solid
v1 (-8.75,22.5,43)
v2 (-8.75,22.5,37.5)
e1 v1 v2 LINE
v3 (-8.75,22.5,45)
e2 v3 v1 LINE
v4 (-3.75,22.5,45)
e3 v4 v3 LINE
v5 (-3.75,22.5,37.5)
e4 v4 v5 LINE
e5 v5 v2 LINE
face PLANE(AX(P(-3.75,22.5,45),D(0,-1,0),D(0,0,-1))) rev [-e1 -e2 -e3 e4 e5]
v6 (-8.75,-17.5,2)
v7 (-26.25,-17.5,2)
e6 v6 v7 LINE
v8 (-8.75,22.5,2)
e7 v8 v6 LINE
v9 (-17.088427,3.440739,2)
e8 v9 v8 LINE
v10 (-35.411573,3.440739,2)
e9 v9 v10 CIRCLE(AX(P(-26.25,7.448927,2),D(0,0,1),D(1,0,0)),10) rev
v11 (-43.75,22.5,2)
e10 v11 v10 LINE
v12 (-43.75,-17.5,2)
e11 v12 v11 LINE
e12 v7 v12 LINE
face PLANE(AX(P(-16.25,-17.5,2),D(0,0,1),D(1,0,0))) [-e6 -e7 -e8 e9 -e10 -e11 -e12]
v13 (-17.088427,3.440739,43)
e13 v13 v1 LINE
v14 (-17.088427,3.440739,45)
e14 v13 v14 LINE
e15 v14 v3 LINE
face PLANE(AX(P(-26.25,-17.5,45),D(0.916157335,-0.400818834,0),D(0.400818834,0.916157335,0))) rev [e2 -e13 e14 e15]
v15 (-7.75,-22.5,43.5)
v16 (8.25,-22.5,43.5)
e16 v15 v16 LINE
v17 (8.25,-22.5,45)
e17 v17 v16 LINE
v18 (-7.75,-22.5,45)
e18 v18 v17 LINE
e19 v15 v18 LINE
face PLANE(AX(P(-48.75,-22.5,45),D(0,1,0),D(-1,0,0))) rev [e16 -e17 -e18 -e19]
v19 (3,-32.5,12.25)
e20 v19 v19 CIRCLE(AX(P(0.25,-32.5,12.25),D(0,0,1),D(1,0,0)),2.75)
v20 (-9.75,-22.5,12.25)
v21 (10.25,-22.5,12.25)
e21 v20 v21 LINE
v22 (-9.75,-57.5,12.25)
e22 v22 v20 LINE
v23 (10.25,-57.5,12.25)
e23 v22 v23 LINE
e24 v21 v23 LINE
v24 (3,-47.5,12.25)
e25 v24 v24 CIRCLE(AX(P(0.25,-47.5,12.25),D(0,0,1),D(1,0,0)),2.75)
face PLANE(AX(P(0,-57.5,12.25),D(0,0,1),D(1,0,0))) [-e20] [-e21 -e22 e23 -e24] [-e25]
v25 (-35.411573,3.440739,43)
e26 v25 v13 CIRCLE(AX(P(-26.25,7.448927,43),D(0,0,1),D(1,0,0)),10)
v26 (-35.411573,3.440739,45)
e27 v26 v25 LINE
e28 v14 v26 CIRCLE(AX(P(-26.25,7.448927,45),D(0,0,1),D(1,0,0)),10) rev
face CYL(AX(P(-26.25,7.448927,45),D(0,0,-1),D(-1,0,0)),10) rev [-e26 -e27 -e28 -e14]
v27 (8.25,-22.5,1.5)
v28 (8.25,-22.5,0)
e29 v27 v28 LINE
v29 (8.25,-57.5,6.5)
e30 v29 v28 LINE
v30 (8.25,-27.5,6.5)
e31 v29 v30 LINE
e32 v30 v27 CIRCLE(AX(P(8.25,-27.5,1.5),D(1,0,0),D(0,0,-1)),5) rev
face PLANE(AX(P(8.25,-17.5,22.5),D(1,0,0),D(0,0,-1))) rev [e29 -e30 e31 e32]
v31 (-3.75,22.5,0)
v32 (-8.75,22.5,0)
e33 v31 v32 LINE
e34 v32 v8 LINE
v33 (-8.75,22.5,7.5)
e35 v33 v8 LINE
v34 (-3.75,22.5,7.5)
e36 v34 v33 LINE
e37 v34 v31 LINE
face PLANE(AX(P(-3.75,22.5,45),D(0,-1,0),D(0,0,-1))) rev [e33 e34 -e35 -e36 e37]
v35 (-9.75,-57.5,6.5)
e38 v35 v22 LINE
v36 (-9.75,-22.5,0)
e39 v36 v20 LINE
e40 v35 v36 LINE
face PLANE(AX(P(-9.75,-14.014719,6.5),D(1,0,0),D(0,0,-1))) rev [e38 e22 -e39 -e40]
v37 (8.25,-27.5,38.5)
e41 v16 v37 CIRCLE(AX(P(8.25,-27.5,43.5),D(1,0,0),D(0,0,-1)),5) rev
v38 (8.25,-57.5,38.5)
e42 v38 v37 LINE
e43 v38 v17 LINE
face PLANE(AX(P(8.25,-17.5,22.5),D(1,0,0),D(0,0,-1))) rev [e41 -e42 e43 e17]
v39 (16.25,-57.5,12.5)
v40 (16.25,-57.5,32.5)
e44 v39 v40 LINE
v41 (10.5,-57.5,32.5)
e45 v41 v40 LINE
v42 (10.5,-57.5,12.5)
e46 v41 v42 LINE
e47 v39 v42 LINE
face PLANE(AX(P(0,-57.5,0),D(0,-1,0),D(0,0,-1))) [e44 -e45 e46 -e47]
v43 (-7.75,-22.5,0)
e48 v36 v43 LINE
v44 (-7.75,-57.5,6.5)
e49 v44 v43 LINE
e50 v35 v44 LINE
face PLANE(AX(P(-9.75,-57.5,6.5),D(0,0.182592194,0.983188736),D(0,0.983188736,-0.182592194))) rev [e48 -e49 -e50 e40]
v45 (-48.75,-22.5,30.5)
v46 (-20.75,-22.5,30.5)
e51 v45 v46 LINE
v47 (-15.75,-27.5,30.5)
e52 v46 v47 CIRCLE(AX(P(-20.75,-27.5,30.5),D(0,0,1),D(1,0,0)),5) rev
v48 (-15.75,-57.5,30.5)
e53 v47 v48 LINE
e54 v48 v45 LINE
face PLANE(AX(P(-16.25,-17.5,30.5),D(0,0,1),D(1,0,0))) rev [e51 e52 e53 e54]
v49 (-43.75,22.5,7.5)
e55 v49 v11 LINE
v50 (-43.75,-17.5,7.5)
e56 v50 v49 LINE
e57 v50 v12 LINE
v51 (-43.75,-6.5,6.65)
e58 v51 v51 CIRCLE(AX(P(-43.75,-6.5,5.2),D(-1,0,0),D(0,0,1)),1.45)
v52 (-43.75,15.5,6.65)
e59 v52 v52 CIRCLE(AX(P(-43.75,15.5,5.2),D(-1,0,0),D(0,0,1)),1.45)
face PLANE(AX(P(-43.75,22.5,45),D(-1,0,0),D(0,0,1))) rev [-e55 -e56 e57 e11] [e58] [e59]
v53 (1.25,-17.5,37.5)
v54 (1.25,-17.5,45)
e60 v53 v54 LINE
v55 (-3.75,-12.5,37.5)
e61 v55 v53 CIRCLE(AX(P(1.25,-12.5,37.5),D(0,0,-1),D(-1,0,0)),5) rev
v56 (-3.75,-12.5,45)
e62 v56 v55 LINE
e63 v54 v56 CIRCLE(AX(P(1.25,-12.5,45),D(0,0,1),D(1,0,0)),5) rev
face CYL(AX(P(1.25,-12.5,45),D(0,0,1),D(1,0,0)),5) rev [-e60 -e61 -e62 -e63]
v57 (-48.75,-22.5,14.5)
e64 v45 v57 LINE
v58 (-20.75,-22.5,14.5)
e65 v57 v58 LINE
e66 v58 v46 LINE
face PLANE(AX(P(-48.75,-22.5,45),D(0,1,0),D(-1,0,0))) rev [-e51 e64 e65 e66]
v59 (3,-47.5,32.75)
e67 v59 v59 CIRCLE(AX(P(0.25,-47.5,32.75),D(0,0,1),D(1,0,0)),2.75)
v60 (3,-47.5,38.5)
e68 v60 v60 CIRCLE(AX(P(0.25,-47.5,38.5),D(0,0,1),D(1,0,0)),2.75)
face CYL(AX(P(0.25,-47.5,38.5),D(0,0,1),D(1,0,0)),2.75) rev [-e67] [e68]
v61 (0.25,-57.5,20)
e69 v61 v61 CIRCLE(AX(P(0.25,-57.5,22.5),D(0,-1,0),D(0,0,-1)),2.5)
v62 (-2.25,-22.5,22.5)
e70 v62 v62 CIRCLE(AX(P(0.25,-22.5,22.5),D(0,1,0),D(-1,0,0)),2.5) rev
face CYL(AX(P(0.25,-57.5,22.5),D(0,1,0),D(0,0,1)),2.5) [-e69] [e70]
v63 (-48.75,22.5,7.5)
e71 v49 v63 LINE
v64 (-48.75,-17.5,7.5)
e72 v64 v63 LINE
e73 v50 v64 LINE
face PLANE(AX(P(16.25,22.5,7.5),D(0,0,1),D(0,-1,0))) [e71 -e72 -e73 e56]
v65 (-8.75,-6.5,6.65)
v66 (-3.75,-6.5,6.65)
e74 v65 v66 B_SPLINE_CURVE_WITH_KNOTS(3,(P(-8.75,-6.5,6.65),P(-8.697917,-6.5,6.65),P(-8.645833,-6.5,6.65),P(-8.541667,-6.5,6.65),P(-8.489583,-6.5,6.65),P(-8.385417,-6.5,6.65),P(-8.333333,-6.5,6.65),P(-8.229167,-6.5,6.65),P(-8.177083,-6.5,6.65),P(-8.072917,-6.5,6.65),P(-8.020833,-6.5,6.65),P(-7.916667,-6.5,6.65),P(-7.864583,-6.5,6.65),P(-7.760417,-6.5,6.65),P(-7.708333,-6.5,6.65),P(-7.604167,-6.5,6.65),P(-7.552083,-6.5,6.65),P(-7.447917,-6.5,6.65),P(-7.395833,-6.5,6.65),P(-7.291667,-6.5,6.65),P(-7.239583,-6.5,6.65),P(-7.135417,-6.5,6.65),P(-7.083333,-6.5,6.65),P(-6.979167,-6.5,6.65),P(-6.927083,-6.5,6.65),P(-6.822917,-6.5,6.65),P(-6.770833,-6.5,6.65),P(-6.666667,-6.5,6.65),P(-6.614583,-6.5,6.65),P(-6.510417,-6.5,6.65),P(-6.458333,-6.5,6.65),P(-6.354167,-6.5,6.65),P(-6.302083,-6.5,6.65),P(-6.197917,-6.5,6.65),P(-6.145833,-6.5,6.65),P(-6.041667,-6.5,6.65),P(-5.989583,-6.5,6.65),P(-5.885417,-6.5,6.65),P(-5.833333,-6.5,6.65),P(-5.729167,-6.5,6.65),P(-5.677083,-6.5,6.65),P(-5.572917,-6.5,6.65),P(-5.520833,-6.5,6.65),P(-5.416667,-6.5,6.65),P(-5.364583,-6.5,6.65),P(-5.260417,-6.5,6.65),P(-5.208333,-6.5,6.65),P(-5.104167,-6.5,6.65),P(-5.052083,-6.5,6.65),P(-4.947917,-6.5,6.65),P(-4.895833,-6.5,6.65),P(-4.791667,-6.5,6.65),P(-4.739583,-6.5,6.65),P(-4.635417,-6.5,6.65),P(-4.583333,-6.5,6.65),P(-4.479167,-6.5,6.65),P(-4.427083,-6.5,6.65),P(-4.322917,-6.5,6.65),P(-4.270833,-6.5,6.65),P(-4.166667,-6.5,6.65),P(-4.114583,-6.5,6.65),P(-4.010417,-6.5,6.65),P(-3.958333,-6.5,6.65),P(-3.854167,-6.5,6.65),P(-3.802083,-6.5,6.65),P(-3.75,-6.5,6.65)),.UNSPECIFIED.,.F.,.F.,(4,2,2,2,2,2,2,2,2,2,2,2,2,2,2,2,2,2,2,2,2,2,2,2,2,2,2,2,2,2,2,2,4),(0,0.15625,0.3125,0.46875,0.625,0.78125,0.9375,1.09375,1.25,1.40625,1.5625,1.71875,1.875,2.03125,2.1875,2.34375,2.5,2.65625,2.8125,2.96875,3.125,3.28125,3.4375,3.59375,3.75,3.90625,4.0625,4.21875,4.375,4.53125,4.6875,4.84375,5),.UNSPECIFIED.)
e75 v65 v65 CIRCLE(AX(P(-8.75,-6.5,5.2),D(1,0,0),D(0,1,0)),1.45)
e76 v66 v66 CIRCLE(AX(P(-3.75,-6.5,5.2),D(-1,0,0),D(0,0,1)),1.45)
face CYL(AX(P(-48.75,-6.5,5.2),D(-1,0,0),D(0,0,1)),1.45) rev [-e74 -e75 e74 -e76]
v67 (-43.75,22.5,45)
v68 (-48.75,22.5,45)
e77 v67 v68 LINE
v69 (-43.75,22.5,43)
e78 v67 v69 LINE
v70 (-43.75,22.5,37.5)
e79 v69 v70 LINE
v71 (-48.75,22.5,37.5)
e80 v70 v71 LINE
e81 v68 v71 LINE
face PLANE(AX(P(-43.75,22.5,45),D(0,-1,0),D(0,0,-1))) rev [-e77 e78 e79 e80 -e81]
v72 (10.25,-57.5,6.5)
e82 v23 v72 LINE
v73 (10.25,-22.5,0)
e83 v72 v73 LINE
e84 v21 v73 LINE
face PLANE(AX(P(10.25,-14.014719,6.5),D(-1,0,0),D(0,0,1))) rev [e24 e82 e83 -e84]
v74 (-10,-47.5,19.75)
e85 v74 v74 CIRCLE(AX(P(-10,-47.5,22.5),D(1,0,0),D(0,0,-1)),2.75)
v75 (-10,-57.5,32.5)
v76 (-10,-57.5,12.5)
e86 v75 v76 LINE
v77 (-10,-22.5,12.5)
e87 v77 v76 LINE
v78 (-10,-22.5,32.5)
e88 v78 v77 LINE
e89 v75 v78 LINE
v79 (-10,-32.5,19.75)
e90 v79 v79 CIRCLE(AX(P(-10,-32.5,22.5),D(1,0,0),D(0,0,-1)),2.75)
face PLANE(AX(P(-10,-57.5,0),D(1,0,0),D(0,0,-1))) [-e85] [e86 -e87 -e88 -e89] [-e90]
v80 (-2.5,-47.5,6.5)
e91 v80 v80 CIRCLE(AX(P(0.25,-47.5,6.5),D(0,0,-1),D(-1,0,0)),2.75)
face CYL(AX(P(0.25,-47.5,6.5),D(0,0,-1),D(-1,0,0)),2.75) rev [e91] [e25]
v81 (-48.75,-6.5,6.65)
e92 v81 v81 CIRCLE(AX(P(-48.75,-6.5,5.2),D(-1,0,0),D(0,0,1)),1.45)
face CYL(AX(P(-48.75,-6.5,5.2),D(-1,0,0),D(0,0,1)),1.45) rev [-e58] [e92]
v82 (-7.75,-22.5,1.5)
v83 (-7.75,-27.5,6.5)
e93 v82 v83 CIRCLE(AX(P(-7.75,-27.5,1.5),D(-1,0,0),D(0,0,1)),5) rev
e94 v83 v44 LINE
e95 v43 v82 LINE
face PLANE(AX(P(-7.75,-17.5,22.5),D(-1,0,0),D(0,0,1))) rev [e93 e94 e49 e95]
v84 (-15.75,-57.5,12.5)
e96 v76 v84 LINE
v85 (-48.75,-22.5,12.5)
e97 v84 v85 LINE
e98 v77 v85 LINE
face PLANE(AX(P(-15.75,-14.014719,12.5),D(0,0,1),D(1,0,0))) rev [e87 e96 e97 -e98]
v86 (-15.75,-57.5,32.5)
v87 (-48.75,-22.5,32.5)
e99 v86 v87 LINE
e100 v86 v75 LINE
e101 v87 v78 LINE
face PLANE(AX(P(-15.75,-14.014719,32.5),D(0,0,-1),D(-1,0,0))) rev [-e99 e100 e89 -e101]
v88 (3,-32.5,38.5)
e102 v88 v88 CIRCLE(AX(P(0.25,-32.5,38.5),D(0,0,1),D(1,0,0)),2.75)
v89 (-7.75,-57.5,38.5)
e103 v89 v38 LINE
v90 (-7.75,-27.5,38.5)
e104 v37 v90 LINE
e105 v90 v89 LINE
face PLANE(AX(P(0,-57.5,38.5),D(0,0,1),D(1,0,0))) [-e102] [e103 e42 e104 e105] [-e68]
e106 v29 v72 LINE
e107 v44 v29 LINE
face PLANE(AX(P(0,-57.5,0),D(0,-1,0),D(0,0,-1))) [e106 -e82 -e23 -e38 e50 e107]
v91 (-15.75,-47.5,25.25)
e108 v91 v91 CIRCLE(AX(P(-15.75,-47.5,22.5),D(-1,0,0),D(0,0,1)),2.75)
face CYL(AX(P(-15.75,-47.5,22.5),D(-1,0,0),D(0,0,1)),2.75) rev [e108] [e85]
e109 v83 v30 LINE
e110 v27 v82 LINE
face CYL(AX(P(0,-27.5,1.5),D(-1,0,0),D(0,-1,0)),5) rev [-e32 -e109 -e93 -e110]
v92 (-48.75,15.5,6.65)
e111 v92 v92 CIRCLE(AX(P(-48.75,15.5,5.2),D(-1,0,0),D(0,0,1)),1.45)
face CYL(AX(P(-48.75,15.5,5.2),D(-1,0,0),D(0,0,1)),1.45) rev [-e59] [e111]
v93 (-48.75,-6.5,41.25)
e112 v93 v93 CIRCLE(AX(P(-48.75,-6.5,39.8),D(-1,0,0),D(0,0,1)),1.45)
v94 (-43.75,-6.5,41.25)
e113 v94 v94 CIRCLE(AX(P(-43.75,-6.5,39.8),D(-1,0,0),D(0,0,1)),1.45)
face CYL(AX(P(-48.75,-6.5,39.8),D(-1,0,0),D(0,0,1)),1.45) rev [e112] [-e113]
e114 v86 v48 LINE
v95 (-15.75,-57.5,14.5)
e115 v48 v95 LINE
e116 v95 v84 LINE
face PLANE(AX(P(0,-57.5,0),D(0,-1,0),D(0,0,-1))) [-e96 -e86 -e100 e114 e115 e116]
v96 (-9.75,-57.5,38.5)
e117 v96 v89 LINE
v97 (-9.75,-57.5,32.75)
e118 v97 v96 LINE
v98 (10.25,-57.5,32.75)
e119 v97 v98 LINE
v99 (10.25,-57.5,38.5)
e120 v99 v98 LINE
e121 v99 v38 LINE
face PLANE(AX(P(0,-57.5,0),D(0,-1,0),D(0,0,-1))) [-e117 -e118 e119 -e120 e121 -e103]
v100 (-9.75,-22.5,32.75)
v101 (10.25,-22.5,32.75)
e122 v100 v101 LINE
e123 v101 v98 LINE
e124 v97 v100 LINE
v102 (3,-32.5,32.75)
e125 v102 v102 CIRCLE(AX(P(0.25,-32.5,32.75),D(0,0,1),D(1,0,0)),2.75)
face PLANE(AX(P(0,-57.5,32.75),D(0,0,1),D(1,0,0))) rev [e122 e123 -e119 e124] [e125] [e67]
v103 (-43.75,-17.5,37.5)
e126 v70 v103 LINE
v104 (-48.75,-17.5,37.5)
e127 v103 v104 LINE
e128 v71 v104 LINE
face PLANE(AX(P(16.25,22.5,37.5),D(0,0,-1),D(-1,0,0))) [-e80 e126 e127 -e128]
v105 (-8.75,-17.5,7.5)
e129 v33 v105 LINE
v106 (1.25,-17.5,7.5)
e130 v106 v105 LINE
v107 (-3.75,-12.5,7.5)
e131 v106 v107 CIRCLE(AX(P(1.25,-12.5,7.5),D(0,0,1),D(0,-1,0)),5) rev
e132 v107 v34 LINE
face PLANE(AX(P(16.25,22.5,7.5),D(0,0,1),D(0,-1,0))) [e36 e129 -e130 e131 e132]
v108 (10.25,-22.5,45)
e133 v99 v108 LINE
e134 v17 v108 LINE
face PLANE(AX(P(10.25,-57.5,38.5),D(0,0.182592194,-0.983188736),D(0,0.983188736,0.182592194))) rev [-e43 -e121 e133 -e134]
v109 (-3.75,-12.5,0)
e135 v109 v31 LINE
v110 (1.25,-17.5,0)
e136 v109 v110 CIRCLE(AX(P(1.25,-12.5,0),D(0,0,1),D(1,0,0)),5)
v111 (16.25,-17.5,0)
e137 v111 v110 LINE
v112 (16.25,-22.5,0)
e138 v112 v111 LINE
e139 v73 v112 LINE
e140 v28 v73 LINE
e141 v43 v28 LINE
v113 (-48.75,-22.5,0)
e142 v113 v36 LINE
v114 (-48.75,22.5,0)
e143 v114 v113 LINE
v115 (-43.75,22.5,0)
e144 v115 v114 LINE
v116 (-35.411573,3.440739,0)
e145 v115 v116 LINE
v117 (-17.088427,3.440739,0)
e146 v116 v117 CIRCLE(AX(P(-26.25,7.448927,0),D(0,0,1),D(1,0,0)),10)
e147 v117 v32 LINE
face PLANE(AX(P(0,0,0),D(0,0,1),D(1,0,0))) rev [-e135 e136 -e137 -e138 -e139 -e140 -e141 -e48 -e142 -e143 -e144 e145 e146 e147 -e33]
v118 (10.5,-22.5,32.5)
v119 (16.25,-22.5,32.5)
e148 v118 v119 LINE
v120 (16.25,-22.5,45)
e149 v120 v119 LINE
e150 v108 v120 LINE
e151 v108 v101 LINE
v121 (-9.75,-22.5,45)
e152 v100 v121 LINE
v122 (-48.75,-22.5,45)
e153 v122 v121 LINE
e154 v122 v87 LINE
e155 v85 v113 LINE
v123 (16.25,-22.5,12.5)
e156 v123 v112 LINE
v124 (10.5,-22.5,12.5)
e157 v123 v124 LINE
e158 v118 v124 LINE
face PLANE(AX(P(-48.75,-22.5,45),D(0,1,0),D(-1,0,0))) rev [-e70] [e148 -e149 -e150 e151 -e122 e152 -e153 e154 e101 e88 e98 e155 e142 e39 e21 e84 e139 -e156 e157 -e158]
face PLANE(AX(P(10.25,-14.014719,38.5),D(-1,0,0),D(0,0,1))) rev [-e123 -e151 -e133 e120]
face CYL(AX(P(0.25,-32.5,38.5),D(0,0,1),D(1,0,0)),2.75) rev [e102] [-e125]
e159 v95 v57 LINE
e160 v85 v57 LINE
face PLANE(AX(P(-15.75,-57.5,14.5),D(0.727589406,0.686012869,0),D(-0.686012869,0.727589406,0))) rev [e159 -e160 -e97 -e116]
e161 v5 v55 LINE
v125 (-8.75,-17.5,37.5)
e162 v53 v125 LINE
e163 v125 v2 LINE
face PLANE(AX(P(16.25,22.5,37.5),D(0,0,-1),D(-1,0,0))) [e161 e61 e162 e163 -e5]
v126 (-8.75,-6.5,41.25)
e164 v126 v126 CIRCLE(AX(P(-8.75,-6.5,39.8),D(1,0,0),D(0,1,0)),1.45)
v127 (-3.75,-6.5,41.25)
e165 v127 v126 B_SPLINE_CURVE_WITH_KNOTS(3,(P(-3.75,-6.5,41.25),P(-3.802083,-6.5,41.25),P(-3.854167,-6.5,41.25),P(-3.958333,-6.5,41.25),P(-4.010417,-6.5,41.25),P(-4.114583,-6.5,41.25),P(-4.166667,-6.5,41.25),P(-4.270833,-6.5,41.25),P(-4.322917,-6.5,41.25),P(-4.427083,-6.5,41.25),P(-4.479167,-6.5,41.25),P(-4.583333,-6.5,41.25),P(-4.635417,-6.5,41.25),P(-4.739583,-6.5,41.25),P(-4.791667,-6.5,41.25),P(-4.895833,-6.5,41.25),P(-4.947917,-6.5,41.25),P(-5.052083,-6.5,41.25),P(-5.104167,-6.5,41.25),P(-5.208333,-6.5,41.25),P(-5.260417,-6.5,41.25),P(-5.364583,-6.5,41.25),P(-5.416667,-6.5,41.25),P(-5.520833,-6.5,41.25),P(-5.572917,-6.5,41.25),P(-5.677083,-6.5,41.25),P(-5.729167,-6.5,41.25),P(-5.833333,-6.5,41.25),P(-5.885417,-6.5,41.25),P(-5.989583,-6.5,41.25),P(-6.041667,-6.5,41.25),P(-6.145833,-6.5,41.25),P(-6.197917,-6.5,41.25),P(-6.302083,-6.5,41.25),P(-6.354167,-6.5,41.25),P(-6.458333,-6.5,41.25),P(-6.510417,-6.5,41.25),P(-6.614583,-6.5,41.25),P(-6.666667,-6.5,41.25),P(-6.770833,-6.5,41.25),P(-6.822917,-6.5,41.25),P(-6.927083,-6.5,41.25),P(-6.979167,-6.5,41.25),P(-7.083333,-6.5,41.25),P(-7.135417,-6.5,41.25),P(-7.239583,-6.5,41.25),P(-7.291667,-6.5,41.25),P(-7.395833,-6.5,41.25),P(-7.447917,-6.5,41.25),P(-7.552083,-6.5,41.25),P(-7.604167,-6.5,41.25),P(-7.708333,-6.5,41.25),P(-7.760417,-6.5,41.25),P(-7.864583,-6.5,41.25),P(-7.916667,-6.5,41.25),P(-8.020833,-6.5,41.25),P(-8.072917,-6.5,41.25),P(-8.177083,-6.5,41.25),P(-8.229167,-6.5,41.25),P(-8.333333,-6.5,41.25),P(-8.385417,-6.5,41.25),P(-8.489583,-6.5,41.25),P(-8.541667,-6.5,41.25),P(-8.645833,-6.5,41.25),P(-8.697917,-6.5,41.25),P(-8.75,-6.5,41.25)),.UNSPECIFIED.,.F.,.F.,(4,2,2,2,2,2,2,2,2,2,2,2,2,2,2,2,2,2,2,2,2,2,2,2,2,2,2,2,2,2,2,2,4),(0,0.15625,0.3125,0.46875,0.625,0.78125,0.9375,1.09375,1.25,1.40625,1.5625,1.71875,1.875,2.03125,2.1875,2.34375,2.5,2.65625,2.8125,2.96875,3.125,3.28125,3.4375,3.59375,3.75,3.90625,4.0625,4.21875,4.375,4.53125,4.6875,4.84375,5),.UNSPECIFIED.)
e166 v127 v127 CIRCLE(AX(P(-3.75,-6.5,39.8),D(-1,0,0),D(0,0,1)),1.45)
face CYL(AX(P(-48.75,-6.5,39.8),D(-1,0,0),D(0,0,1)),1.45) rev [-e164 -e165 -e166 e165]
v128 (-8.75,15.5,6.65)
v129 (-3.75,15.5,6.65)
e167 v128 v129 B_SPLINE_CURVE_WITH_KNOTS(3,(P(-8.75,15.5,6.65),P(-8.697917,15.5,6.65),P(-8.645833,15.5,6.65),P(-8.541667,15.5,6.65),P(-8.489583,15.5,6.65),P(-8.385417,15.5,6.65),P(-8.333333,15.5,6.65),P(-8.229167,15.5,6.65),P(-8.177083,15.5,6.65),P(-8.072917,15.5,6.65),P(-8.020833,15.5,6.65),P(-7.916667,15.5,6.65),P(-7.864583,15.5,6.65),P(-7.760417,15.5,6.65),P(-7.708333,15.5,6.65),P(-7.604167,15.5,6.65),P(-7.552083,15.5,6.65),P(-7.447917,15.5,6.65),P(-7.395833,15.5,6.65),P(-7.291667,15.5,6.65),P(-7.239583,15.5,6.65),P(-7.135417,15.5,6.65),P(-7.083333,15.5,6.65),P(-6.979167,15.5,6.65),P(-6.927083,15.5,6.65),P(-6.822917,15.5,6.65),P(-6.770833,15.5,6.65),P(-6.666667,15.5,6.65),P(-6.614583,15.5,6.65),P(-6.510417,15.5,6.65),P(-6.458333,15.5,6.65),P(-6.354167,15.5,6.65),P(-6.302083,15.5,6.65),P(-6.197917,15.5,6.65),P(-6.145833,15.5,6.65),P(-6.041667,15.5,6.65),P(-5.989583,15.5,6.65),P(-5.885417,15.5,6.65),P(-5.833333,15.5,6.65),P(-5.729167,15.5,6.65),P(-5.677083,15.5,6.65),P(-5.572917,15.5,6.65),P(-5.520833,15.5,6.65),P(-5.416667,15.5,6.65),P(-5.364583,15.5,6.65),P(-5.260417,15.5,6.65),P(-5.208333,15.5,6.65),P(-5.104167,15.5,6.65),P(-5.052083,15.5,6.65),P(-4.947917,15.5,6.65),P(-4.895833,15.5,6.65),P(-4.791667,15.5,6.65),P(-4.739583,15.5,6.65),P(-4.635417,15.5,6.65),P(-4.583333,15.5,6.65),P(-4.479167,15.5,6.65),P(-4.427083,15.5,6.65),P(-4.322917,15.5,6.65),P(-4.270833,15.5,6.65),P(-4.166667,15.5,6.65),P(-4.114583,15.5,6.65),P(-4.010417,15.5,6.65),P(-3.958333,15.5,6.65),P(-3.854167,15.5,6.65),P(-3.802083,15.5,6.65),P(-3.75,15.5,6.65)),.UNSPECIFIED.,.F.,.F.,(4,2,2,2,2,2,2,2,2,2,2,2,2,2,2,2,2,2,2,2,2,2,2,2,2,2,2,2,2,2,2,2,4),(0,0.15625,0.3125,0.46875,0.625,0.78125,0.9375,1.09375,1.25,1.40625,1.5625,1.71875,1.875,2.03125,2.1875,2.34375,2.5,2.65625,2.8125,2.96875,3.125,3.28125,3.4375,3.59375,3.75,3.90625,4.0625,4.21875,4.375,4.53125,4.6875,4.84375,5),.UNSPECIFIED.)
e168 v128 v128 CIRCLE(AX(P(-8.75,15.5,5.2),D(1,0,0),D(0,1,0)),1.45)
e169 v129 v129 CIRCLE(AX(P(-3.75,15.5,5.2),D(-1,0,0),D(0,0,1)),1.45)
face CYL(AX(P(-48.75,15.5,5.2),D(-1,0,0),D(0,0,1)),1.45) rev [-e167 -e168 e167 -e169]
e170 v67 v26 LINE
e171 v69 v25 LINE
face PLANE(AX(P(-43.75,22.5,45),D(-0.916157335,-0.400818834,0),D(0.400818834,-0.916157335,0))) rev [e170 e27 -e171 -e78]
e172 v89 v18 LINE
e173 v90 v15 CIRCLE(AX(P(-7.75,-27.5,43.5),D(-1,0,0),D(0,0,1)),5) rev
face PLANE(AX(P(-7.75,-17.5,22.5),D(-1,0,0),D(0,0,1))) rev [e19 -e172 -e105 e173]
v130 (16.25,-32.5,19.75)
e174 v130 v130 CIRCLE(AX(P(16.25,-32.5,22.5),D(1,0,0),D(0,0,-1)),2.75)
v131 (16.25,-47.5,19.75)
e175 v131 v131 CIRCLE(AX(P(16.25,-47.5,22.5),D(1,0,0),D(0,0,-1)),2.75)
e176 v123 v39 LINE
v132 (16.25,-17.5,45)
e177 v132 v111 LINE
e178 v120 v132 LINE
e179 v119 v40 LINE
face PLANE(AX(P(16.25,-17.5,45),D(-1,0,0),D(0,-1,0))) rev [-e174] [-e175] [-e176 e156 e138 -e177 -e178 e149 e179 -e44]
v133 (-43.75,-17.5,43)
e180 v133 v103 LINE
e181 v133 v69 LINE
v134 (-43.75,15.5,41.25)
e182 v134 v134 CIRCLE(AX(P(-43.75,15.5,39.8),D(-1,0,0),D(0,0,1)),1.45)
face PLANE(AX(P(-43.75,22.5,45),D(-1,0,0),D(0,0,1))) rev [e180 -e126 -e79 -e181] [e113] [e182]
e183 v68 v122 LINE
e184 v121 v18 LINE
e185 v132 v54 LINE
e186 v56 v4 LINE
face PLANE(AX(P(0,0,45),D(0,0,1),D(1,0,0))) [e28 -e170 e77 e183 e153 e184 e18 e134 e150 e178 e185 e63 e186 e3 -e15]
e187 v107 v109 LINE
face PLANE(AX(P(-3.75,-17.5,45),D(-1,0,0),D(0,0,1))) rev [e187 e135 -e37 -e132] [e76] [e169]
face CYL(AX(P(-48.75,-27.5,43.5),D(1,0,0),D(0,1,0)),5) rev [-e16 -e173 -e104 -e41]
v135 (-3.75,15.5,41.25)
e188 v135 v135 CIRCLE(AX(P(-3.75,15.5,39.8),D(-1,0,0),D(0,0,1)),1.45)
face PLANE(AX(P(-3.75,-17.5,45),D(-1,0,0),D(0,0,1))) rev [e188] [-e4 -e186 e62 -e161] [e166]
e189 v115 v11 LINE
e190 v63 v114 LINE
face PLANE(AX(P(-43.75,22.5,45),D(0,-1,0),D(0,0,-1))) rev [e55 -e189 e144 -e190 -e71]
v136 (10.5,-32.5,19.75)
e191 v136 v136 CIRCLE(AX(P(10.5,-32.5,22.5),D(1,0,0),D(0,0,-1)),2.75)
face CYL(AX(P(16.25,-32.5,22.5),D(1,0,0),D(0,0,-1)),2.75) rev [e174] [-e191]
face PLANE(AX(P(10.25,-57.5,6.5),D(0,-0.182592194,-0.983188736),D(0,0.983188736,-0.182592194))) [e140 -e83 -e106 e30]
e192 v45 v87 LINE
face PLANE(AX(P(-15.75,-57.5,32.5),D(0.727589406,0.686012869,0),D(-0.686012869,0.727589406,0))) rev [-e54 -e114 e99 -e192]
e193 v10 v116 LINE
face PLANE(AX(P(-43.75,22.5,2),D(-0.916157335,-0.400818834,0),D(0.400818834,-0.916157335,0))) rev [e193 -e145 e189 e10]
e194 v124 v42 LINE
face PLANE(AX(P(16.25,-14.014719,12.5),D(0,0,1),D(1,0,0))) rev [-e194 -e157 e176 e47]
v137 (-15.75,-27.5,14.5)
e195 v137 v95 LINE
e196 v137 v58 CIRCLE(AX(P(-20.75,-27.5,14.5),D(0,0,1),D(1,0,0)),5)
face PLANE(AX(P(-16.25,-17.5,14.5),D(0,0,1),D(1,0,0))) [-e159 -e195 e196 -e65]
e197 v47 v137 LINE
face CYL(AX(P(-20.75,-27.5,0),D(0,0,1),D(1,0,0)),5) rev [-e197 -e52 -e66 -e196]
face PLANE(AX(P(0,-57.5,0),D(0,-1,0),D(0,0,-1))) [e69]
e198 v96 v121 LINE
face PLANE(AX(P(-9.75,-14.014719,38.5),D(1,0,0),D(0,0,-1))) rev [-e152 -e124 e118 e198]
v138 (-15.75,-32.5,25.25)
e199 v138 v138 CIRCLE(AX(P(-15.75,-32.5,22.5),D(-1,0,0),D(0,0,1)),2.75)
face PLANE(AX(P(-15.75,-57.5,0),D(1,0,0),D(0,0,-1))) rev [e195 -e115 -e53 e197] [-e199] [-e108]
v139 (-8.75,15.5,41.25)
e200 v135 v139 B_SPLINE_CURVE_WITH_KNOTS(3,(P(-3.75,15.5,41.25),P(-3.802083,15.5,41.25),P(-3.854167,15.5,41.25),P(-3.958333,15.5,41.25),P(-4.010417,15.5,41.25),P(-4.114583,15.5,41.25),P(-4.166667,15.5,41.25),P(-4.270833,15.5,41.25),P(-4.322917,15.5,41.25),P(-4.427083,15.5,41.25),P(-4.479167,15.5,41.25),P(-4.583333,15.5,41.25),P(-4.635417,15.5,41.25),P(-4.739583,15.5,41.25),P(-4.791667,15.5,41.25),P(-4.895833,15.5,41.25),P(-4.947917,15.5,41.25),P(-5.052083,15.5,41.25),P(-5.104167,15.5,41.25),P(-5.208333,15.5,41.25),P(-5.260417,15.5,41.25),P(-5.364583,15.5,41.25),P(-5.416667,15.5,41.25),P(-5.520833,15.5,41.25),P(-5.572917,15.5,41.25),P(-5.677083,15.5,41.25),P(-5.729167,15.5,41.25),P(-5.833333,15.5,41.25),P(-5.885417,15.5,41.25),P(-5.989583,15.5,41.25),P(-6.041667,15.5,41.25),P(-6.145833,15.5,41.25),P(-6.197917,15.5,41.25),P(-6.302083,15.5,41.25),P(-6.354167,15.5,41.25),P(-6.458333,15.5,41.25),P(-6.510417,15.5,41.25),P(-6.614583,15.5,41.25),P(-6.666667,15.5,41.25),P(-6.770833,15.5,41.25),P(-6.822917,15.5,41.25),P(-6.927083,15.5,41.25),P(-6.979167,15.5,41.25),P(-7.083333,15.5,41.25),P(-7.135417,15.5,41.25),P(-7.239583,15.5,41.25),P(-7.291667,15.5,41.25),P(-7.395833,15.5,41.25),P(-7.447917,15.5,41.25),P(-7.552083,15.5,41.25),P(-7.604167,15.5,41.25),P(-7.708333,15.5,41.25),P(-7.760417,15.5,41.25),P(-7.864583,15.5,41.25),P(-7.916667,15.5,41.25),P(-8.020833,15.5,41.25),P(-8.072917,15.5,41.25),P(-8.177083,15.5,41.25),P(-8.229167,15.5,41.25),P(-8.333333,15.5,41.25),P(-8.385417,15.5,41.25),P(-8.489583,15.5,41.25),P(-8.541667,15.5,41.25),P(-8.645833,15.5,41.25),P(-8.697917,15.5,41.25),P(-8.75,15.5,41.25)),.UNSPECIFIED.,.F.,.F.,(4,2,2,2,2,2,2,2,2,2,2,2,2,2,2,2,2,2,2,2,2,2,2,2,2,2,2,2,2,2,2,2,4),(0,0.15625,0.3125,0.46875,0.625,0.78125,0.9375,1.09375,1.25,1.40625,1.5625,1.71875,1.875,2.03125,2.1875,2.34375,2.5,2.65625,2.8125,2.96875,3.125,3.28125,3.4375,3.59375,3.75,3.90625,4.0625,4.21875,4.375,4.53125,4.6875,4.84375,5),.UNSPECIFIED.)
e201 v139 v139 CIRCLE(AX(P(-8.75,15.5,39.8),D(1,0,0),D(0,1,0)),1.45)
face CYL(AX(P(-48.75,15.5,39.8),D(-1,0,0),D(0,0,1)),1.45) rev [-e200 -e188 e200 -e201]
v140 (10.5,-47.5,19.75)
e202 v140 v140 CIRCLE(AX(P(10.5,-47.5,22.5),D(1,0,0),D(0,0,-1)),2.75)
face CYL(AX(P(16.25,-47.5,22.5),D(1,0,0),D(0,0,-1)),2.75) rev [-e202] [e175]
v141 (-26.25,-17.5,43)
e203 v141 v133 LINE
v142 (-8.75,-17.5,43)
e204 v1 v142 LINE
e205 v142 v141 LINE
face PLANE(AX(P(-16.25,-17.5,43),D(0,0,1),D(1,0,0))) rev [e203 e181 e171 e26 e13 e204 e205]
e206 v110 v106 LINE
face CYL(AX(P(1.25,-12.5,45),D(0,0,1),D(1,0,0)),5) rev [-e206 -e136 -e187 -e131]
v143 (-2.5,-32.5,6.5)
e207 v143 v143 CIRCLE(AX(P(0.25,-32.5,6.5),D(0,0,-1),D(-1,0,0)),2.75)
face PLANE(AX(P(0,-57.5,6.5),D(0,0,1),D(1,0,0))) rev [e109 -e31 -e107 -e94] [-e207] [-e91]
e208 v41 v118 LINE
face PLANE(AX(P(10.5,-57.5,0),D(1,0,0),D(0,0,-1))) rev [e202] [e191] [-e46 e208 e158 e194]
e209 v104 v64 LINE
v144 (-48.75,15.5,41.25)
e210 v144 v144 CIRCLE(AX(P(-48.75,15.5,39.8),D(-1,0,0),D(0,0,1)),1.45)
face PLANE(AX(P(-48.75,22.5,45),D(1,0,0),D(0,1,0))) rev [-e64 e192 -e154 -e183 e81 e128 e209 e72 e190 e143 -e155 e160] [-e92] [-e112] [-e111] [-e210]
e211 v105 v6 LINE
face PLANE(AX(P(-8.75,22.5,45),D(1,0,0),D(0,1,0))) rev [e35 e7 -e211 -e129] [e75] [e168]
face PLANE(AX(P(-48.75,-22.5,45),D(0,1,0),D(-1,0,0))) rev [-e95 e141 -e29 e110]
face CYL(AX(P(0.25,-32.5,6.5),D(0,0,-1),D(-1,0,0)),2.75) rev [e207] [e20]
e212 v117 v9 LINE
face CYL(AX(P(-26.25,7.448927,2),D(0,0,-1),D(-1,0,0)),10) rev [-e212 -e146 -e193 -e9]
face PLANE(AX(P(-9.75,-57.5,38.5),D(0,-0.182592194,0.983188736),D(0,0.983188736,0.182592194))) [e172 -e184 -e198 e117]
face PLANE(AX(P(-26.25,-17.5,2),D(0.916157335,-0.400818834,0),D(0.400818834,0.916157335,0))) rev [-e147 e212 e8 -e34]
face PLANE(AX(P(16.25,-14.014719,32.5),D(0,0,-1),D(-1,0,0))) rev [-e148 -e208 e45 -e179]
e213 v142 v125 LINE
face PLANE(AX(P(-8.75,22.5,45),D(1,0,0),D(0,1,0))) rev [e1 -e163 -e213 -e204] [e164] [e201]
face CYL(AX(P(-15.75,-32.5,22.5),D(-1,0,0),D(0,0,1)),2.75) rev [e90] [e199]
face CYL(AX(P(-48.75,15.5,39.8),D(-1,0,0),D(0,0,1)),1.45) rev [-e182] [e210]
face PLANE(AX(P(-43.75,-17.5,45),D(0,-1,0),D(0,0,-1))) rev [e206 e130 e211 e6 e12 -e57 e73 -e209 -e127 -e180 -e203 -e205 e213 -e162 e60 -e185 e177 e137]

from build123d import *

# Parameters (mm, degrees)
BOSS_EXTRUDE1_DEPTH           = 45
SKETCH3_W                     = 30
SKETCH3_H                     = 40
CUT_EXTRUDE1_DEPTH            = 83.196411114
SKETCH4_W                     = 32
SKETCH4_H                     = 32
SKETCH4_W_2                   = 20.5
SKETCH4_H_2                   = 20.5
SKETCH4_R                     = 2.5
BOSS_EXTRUDE2_DEPTH           = 35
SKETCH6_W                     = 6
SKETCH6_H                     = 6
CUT_EXTRUDE4_DEPTH            = 35
RIB1_REACH                    = 84.092
SKETCH9_WALL_W                = 214.287640152
SKETCH9_WALL_H                = 2
LPATTERN1_COUNT               = 2
LPATTERN1_PITCH               = 18
RIB6_REACH                    = 95.874
SKETCH14_WALL_W               = 225.34562544
SKETCH14_WALL_H               = 2
RIB7_START                    = -2
RIB7_DEPTH                    = 2
CIRPATTERN3_START             = -9.75
CIRPATTERN3_DEPTH             = 2
CIRPATTERN3_START_2           = 8.25
CIRPATTERN3_2_DEPTH           = 2
FILLET2_R                     = 5
FILLET3_R                     = 5
RIB10_REACH                   = 89.794
SKETCH17_WALL_W               = 221.248919868
SKETCH17_WALL_H               = 2
RIB11_REACH                   = 89.794
SKETCH18_WALL_W               = 221.248919868
SKETCH18_WALL_H               = 2
FILLET4_R                     = 10
LPATTERN2_COUNT               = 2
LPATTERN2_PITCH               = 43
FILLET4_OF_LPATTERN2_R        = 10
M5_CLEARANCE_HOLE2_AT_2_COUNT = 2
M5_CLEARANCE_HOLE2_AT_2_PITCH = 15
CIRPATTERN4_START             = 6.5
CIRPATTERN4_OUTLINE_R         = 2.75
CIRPATTERN4_DEPTH             = 5.75
CIRPATTERN4_START_2           = -15.75
CIRPATTERN4_2_OUTLINE_R       = 2.75
CIRPATTERN4_2_DEPTH           = 5.75
CIRPATTERN4_START_3           = 10.5
CIRPATTERN4_3_OUTLINE_R       = 2.75
CIRPATTERN4_3_DEPTH           = 5.75
M2_5_CLEARANCE_HOLE1_D        = 2.9


# Read off the part's stored shape, not the designer's step: Rib7, CirPattern3, CirPattern4
with BuildPart() as part:
    # Sketch2 → Boss-Extrude1 (new body)
    with BuildSketch(Plane.XY):
        Polygon((-48.75, -22.5), (16.25, -22.5), (16.25, -17.5), (-3.75, -17.5), (-3.75, 22.5), (-8.75, 22.5), (-8.75, -17.5), (-43.75, -17.5), (-43.75, 22.5), (-48.75, 22.5), align=None)
    extrude(amount=BOSS_EXTRUDE1_DEPTH)

    # Sketch3 → Cut-Extrude1 (cut, through all)
    with BuildSketch(Plane(origin=(-48.75, 0, 0), x_dir=(0, 0, -1), z_dir=(1, 0, 0))):
        with Locations((-22.5, 2.5)):
            Rectangle(SKETCH3_W, SKETCH3_H)
    extrude(amount=CUT_EXTRUDE1_DEPTH, mode=Mode.SUBTRACT)

    # Sketch4 → Boss-Extrude2 (add)
    # profile 1 of 2: a face of its own
    with BuildSketch(Plane.XZ.offset(22.5)):
        with Locations((0.25, 22.5)):
            Rectangle(SKETCH4_W, SKETCH4_H)
        with Locations((0.25, 22.5)):
            Rectangle(SKETCH4_W_2, SKETCH4_H_2, mode=Mode.SUBTRACT)
    # profile 2 of 2: a face of its own
    with BuildSketch(Plane.XZ.offset(22.5)):
        with Locations(Location((0.25, 22.5, 0), (0, 0, 180))):
            Circle(SKETCH4_R)
    extrude(amount=BOSS_EXTRUDE2_DEPTH)

    # Sketch6 → Cut-Extrude4 (cut)
    with BuildSketch(Plane(origin=(0, -57.5, 0), x_dir=(-1, 0, 0), z_dir=(0, -1, 0))):
        with Locations((12.75, -35.5)):
            Rectangle(SKETCH6_W, SKETCH6_H)
        with Locations((-13.25, -35.5)):
            Rectangle(SKETCH6_W, SKETCH6_H)
        with Locations((-13.25, -9.5)):
            Rectangle(SKETCH6_W, SKETCH6_H)
        with Locations((12.75, -9.5)):
            Rectangle(SKETCH6_W, SKETCH6_H)
    extrude(amount=-CUT_EXTRUDE4_DEPTH, mode=Mode.SUBTRACT)

    # Sketch9 wall → Rib1 (add, up to next)
    with BuildSketch(Plane(origin=(-32.25, -40, 32.5), x_dir=(-0.686012868689, 0.727589406185, 0), z_dir=(-0.727589406185, -0.686012868689, 0)), mode=Mode.PRIVATE) as rib1_sk1:
        with Locations((0, 1)):
            Rectangle(SKETCH9_WALL_W, SKETCH9_WALL_H)
    rib1_tool1 = extrude(rib1_sk1.sketch, amount=-RIB1_REACH, mode=Mode.PRIVATE) - part.part
    rib1 = rib1_tool1.solids().sort_by_distance((-32.25, -40, 32.5))[0]
    add(rib1)

    # LPattern1: Rib1 ×2
    with Locations(*[(0, 0, -i * LPATTERN1_PITCH) for i in range(1, LPATTERN1_COUNT)]):
        add(rib1)

    # Sketch14 wall → Rib6 (add, up to next)
    with BuildSketch(Plane(origin=(10.25, -40, 3.25), x_dir=(0, 0.983188736076, -0.182592193843), z_dir=(0, 0.182592193843, 0.983188736076)), mode=Mode.PRIVATE) as rib6_sk1:
        with Locations((0, 1)):
            Rectangle(SKETCH14_WALL_W, SKETCH14_WALL_H)
    rib6_tool1 = extrude(rib6_sk1.sketch, amount=RIB6_REACH, mode=Mode.PRIVATE) - part.part
    add(rib6_tool1.solids().sort_by_distance((10.25, -40, 3.25))[0])

    # Rib7 outline → Rib7 (add)
    with BuildSketch(Plane.ZY.offset(9.75).offset(RIB7_START)):
        Polygon((0, -22.5), (6.5, -57.5), (6.5, -22.5), align=None)
    extrude(amount=RIB7_DEPTH)

    # CirPattern3 outline → CirPattern3 (add)
    with BuildSketch(Plane.YZ.offset(CIRPATTERN3_START)):
        Polygon((-22.5, 38.5), (-22.5, 45), (-57.5, 38.5), align=None)
    extrude(amount=CIRPATTERN3_DEPTH)

    # CirPattern3 2 outline → CirPattern3 2 (add)
    with BuildSketch(Plane.YZ.offset(CIRPATTERN3_START_2)):
        Polygon((-22.5, 38.5), (-22.5, 45), (-57.5, 38.5), align=None)
    extrude(amount=CIRPATTERN3_2_DEPTH)

    # Fillet2
    fillet2_edges = [part.edges().sort_by_distance(p)[0] for p in [
        (-15.75, -22.5, 22.5),
        (0.25, -22.5, 6.5),
        (0.25, -22.5, 38.5),
    ]]
    fillet(fillet2_edges, radius=FILLET2_R)

    # Fillet3
    fillet3_edges = [part.edges().sort_by_distance(p)[0] for p in [
        (-3.75, -17.5, 41.25),
        (-3.75, -17.5, 3.75),
    ]]
    fillet(fillet3_edges, radius=FILLET3_R)

    # Sketch17 wall → Rib10 (add, up to next)
    with BuildSketch(Plane(origin=(-35, 2.5, 45), x_dir=(0.40081883402, -0.916157334902, 0), z_dir=(0.916157334902, 0.40081883402, 0)), mode=Mode.PRIVATE) as rib10_sk1:
        with Locations((0, 1)):
            Rectangle(SKETCH17_WALL_W, SKETCH17_WALL_H)
    rib10_tool1 = extrude(rib10_sk1.sketch, amount=-RIB10_REACH, mode=Mode.PRIVATE) - part.part
    rib10 = rib10_tool1.solids().sort_by_distance((-35, 2.5, 45))[0]
    add(rib10)

    # Sketch18 wall → Rib11 (add, up to next)
    with BuildSketch(Plane(origin=(-17.5, 2.5, 45), x_dir=(0.40081883402, 0.916157334902, 0), z_dir=(-0.916157334902, 0.40081883402, 0)), mode=Mode.PRIVATE) as rib11_sk1:
        with Locations((0, 1)):
            Rectangle(SKETCH18_WALL_W, SKETCH18_WALL_H)
    rib11_tool1 = extrude(rib11_sk1.sketch, amount=-RIB11_REACH, mode=Mode.PRIVATE) - part.part
    rib11 = rib11_tool1.solids().sort_by_distance((-17.5, 2.5, 45))[0]
    add(rib11)

    # Fillet4
    # the kernel refuses this fillet: 10 mm, written as the material it adds along each edge
    with BuildSketch(Plane(origin=(-26.25, -17.5, 45), x_dir=(-0.4008188340200225, 0.9161573349020514, 0), z_dir=(0, 0, -1))) as fillet4_piece_1:
        with BuildLine():
            CenterArc((FILLET4_R * 2.28571428571, FILLET4_R), FILLET4_R, 137.258755461, 132.741244539)
            Line((FILLET4_R * 1.55128805621, FILLET4_R * 1.67868852459), (0, 0))
            Line((0, 0), (FILLET4_R * 2.28571428571, 0))
        make_face()
    extrude(amount=2)

    # LPattern2: Rib10, Rib11 ×2
    with Locations(*[(0, 0, -i * LPATTERN2_PITCH) for i in range(1, LPATTERN2_COUNT)]):
        add(rib10)
        add(rib11)

    # Fillet4 of LPattern2
    # the kernel refuses this fillet: 10 mm, written as the material it adds along each edge
    with BuildSketch(Plane(origin=(-26.25, -17.5, 59.142857143), x_dir=(-0.4008188340200225, 0.9161573349020515, 0), z_dir=(0, 0, -1))) as fillet4_of_lpattern2_piece_1_section:
        with BuildLine():
            CenterArc((FILLET4_OF_LPATTERN2_R * 2.28571428571, FILLET4_OF_LPATTERN2_R), FILLET4_OF_LPATTERN2_R, 137.258755461, 132.741244539)
            Line((FILLET4_OF_LPATTERN2_R * 1.5512880562, FILLET4_OF_LPATTERN2_R * 1.67868852459), (0, 0))
            Line((0, 0), (FILLET4_OF_LPATTERN2_R * 2.28571428571, 0))
        make_face()
    fillet4_of_lpattern2_piece_1 = extrude(amount=59.142857143, mode=Mode.PRIVATE)
    fillet4_of_lpattern2_piece_1 = split(fillet4_of_lpattern2_piece_1, bisect_by=Plane(origin=(-26.25, -6.732617491, 43), z_dir=(0, 0, 1)), keep=Keep.TOP, mode=Mode.PRIVATE)
    fillet4_of_lpattern2_piece_1 = split(fillet4_of_lpattern2_piece_1, bisect_by=Plane(origin=(-26.25, -6.732617491, 45), z_dir=(0, 0, -1)), keep=Keep.TOP, mode=Mode.PRIVATE)
    add(fillet4_of_lpattern2_piece_1)
    with BuildSketch(Plane(origin=(-26.25, -17.5, 2), x_dir=(-0.4008188340200225, 0.9161573349020514, 0), z_dir=(0, 0, -1))) as fillet4_of_lpattern2_piece_2:
        with BuildLine():
            CenterArc((FILLET4_OF_LPATTERN2_R * 2.28571428571, FILLET4_OF_LPATTERN2_R), FILLET4_OF_LPATTERN2_R, 137.258755461, 132.741244539)
            Line((FILLET4_OF_LPATTERN2_R * 1.55128805621, FILLET4_OF_LPATTERN2_R * 1.67868852459), (0, 0))
            Line((0, 0), (FILLET4_OF_LPATTERN2_R * 2.28571428571, 0))
        make_face()
    extrude(amount=2)

    # Sketch22 → M5 Clearance Hole2 (revolve, cut)
    with BuildSketch(Plane(origin=(0.25, -32.5, 38.5), x_dir=(0, -1, 0), z_dir=(1, 0, 0))):
        Polygon((0, 0), (0, 7.652366702), (2.75, 6), (2.75, 0), align=None)
    m5_clearance_hole2 = revolve(axis=Axis((0.25, -32.5, 44.85), (0, 0, -1)), mode=Mode.SUBTRACT)

    # M5 Clearance Hole2 at 2: M5 Clearance Hole2 ×2
    with Locations(*[(0, -i * M5_CLEARANCE_HOLE2_AT_2_PITCH, 0) for i in range(1, M5_CLEARANCE_HOLE2_AT_2_COUNT)]):
        add(m5_clearance_hole2, mode=Mode.SUBTRACT)

    # CirPattern4 outline → CirPattern4 (cut)
    with BuildSketch(Plane.XY.offset(CIRPATTERN4_START)):
        with Locations((0.25, -47.5)):
            Circle(CIRPATTERN4_OUTLINE_R)
        with Locations((0.25, -32.5)):
            Circle(CIRPATTERN4_OUTLINE_R)
    extrude(amount=CIRPATTERN4_DEPTH, mode=Mode.SUBTRACT)

    # CirPattern4 2 outline → CirPattern4 2 (cut)
    with BuildSketch(Plane.YZ.offset(CIRPATTERN4_START_2)):
        with Locations((-47.5, 22.5)):
            Circle(CIRPATTERN4_2_OUTLINE_R)
        with Locations((-32.5, 22.5)):
            Circle(CIRPATTERN4_2_OUTLINE_R)
    extrude(amount=CIRPATTERN4_2_DEPTH, mode=Mode.SUBTRACT)

    # CirPattern4 3 outline → CirPattern4 3 (cut)
    with BuildSketch(Plane.YZ.offset(CIRPATTERN4_START_3)):
        with Locations((-47.5, 22.5)):
            Circle(CIRPATTERN4_3_OUTLINE_R)
        with Locations((-32.5, 22.5)):
            Circle(CIRPATTERN4_3_OUTLINE_R)
    extrude(amount=CIRPATTERN4_3_DEPTH, mode=Mode.SUBTRACT)

    # M2.5 Clearance Hole1 (through all)
    with Locations(Plane.ZY.offset(48.75)):
        with Locations((5.2, 15.5), (39.8, 15.5), (39.8, -6.5), (5.2, -6.5)):
            Hole(M2_5_CLEARANCE_HOLE1_D / 2)


solid = part.part
